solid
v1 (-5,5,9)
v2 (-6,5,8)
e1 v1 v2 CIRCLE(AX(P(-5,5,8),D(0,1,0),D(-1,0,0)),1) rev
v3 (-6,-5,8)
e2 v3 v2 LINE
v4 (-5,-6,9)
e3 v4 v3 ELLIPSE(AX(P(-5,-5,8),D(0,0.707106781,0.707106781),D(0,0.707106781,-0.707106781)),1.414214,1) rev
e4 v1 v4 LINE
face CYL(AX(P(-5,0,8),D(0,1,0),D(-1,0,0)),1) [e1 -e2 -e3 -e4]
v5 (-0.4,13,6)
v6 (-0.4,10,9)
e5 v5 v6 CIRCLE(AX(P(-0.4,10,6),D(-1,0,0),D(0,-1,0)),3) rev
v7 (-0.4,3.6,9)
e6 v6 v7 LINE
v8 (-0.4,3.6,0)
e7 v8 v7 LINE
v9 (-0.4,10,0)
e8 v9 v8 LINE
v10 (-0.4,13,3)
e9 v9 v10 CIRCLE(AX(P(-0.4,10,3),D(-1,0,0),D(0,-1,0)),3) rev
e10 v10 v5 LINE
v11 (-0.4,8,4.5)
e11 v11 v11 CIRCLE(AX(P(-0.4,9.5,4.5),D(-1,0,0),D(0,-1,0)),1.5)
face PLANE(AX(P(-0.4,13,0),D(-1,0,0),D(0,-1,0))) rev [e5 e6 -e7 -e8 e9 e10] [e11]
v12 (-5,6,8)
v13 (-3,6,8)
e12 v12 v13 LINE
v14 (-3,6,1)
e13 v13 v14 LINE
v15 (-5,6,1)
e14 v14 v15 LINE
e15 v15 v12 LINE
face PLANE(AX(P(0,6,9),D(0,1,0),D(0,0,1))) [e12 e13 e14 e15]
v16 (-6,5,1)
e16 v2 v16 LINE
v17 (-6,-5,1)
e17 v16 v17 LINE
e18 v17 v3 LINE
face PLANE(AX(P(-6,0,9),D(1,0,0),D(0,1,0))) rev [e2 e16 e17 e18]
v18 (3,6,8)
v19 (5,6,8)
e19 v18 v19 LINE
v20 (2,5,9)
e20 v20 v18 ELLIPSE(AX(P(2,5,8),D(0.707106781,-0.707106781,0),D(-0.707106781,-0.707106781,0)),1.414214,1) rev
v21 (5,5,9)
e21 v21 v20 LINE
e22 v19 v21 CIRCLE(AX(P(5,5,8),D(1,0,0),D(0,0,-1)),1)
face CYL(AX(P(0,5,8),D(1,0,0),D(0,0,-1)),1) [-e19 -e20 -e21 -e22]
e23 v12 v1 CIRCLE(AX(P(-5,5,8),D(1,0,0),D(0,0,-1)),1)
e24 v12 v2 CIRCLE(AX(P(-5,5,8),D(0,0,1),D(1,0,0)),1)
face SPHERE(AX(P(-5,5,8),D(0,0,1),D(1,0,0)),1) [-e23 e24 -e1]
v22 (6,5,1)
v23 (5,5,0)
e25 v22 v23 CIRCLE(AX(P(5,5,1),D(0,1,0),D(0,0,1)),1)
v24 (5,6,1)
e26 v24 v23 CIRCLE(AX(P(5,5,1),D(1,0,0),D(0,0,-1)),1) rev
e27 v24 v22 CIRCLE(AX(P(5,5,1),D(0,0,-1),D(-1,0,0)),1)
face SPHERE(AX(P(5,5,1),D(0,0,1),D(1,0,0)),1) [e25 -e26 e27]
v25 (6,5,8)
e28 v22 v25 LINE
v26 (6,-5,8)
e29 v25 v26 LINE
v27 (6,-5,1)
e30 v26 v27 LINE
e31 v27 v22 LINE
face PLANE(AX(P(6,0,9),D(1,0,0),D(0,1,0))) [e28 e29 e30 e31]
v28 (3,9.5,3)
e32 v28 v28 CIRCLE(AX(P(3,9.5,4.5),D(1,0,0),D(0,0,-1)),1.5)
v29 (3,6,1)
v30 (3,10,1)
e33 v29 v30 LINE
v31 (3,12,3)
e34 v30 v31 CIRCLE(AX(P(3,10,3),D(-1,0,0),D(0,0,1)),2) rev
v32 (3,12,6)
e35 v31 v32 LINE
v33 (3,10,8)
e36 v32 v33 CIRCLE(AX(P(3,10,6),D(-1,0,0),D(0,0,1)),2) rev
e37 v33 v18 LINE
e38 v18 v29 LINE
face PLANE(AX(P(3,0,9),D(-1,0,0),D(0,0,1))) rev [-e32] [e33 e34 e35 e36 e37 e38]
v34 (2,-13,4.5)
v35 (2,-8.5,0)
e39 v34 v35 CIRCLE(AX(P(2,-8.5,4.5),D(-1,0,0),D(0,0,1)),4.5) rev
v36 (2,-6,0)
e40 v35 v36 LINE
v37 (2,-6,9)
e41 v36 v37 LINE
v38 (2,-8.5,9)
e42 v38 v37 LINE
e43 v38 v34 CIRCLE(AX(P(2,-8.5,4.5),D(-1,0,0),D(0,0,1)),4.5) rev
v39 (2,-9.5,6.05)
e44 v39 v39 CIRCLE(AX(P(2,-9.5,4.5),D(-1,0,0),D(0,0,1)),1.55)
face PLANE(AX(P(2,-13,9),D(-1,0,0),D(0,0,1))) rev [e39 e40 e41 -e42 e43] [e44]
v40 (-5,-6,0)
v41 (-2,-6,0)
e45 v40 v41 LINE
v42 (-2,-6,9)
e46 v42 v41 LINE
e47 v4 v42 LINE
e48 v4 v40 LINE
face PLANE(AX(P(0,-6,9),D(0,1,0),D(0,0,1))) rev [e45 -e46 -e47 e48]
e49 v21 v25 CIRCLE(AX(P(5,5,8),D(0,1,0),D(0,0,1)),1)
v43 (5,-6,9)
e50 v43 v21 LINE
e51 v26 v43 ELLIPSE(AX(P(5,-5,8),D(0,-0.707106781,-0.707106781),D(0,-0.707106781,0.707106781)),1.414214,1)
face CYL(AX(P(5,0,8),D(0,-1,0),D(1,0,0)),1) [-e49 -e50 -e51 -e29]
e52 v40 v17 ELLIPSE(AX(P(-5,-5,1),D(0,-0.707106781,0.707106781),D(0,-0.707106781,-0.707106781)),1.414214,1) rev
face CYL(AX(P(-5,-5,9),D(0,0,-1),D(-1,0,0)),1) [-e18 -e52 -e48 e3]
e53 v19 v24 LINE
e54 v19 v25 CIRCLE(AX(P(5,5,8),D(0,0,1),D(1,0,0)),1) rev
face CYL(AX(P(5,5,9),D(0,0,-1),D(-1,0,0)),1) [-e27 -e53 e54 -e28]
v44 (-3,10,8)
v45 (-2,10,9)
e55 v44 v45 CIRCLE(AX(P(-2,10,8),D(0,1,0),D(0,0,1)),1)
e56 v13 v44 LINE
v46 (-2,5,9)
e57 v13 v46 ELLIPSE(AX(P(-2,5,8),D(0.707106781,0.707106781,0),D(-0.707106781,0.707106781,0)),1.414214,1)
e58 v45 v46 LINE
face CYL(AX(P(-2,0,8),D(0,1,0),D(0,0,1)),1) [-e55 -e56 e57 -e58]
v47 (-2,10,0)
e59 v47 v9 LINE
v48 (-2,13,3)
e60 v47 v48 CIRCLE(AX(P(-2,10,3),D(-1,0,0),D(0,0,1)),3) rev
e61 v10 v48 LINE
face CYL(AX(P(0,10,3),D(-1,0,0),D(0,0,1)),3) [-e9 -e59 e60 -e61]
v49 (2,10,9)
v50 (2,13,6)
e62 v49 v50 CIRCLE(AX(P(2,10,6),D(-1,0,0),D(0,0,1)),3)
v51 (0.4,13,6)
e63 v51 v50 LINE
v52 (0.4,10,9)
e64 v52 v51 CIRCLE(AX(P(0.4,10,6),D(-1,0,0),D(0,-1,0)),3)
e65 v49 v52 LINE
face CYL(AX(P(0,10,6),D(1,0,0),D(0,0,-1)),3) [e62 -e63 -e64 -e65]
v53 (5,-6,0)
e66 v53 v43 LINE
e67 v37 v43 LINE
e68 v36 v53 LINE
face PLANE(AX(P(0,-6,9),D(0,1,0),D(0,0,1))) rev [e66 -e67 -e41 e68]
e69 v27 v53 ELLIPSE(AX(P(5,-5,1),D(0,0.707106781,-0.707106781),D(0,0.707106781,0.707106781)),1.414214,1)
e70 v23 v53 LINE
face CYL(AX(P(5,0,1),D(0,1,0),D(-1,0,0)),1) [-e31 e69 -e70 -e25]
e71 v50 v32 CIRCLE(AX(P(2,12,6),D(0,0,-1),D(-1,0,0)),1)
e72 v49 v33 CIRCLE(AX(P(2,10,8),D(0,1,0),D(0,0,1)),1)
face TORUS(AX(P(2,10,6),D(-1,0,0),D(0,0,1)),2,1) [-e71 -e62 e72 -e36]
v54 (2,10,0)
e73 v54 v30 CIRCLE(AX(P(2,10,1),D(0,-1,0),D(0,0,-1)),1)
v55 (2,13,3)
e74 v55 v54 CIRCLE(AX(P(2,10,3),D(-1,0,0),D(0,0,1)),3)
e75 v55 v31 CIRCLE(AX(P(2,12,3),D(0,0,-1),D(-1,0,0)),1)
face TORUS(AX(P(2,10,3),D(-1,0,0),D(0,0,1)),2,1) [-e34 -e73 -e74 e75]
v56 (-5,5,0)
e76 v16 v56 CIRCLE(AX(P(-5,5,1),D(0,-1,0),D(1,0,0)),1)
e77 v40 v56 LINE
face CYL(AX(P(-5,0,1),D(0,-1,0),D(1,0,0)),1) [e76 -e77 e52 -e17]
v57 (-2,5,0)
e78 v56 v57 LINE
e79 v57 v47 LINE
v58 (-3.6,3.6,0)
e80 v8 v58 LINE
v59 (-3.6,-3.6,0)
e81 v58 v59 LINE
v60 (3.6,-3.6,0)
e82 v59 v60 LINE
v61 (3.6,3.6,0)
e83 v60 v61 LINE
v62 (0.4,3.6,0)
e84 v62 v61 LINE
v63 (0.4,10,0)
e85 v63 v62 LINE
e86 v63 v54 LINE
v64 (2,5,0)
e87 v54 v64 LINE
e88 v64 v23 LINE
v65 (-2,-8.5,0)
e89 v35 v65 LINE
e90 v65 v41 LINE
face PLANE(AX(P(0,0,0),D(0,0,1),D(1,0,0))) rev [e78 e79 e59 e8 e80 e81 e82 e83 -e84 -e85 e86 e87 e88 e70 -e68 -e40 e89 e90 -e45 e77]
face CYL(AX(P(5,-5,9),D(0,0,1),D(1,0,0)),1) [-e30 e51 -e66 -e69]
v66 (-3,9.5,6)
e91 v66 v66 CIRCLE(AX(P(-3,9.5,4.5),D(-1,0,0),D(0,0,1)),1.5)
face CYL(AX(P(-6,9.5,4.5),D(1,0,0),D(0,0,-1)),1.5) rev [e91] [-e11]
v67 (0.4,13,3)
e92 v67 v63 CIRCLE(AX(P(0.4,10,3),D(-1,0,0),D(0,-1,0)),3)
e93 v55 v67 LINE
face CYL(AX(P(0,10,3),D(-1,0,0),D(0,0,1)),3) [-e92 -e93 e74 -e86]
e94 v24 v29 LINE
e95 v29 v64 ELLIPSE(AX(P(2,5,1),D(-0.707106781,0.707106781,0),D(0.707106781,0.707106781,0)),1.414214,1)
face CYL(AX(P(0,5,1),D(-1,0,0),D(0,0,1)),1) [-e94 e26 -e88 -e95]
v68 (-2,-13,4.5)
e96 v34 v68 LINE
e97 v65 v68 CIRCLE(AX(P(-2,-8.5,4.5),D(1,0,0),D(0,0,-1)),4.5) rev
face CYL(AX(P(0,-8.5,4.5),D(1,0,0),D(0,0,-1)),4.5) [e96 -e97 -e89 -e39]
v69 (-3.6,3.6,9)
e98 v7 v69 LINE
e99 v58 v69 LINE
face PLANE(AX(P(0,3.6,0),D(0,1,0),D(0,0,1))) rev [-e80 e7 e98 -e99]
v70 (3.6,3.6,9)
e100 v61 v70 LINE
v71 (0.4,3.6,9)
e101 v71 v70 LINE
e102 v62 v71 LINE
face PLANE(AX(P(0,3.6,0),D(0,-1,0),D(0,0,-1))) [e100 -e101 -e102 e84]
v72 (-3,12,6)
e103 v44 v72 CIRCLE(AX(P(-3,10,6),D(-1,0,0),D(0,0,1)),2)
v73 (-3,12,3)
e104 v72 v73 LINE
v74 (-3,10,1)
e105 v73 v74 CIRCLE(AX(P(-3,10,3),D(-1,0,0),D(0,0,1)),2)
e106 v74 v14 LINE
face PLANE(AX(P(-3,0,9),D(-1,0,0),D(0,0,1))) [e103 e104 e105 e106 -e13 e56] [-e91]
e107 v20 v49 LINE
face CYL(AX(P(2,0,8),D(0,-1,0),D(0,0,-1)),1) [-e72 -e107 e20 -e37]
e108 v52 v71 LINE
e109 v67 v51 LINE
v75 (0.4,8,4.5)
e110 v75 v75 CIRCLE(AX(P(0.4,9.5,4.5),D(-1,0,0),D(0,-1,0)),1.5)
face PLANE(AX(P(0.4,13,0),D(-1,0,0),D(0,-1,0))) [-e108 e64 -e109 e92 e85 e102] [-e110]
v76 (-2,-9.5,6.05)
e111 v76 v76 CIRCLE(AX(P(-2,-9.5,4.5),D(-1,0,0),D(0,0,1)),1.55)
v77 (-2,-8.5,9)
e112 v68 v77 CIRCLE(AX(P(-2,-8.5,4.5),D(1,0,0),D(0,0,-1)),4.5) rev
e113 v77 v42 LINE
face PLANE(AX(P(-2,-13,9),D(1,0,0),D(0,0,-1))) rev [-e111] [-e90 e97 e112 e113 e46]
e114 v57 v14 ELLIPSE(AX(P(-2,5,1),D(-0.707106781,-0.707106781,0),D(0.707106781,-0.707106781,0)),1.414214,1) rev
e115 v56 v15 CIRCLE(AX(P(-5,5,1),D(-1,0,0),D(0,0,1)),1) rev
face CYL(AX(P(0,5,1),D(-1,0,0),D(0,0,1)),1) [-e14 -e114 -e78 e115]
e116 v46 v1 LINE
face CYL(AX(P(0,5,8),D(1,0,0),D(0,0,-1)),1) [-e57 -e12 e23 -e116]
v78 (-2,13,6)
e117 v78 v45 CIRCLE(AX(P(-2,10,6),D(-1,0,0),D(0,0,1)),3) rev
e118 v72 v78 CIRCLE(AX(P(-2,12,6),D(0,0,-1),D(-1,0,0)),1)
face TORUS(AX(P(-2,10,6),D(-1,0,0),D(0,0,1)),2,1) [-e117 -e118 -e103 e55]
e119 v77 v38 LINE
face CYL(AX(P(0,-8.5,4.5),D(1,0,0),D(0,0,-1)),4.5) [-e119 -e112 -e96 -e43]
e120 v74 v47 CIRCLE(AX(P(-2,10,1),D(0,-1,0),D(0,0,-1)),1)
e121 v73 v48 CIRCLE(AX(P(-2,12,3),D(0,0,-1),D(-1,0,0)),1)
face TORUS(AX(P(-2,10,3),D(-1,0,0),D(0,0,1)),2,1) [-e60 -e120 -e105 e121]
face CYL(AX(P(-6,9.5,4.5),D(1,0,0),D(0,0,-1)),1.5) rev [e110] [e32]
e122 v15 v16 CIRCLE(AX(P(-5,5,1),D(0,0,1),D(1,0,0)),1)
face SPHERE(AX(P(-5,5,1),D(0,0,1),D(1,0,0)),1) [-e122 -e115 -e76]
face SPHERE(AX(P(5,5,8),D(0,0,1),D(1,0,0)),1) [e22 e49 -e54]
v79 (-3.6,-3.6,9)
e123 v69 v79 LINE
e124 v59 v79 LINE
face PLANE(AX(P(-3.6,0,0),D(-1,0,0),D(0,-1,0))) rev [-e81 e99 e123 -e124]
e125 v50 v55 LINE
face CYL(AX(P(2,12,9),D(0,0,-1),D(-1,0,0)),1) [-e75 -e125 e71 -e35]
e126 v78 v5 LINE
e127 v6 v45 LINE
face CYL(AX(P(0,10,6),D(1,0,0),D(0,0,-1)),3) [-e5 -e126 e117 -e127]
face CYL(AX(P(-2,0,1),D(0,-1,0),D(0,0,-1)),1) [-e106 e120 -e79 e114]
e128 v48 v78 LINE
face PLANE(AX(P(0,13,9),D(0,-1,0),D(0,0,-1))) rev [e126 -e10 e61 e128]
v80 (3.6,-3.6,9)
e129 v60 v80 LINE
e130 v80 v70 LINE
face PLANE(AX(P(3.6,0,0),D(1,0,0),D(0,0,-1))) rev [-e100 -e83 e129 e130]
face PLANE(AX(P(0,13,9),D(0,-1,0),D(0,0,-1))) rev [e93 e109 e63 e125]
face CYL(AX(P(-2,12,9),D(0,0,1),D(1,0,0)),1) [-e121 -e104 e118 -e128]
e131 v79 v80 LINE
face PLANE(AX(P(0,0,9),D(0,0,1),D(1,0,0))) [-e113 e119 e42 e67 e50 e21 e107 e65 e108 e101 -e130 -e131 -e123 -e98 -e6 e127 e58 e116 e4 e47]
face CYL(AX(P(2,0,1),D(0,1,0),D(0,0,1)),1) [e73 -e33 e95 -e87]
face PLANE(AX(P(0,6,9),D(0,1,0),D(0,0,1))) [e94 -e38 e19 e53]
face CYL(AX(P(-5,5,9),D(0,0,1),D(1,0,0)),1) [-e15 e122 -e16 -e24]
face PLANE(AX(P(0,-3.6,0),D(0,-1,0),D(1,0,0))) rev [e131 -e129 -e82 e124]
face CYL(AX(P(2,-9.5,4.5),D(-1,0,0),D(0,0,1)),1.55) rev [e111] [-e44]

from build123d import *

# Parameters (mm, degrees)
SKETCH_1_W          = 3
SKETCH_1_H          = 7
SKETCH_1_W_2        = 12
SKETCH_1_H_2        = 12
SKETCH_1_W_3        = 7
SKETCH_1_W_4        = 5
EXTRUDE_1_DEPTH     = 9
CUT_EXTRUDE_1_DEPTH = 17.911534525
FILLET_2_R          = 3
SKETCH_4_R          = 1.5
CUT_EXTRUDE_3_DEPTH = 19.193405399
FILLET_3_R          = 1
FILLET_4_R          = 1
FILLET_5_R          = 1
SKETCH_5_W          = 5
SKETCH_5_H          = 7
CUT_EXTRUDE_4_DEPTH = 9
EXTRUDE_2_DEPTH     = 7
FILLET_6_R          = 4.5
SKETCH_7_R          = 1.55
CUT_EXTRUDE_5_DEPTH = 4
SKETCH_8_W          = 3.1
SKETCH_8_H          = 0.1
CUT_EXTRUDE_6_DEPTH = 17.911534525


# Some blends are built 0.0001 mm under size
with BuildPart() as part:
    # 草图1 → 凸台-拉伸1 (new body)
    # profile 1 of 4: a face of its own
    with BuildSketch(Plane.XY):
        with Locations((-1.5, 9.5)):
            Rectangle(SKETCH_1_W, SKETCH_1_H)
    # profile 2 of 4: a face of its own
    with BuildSketch(Plane.XY):
        with Locations((1.5, 9.5)):
            Rectangle(SKETCH_1_W, SKETCH_1_H)
    # profile 3 of 4: a face of its own
    with BuildSketch(Plane.XY):
        Rectangle(SKETCH_1_W_2, SKETCH_1_H_2)
        Rectangle(SKETCH_1_W_3, SKETCH_1_H, mode=Mode.SUBTRACT)
    # profile 4 of 4: a face of its own
    with BuildSketch(Plane.XY):
        with Locations((1, -9.5)):
            Rectangle(SKETCH_1_W_4, SKETCH_1_H)
    extrude(amount=EXTRUDE_1_DEPTH)

    # 草图2 → 切除-拉伸1 (cut, through all)
    with BuildSketch(Plane.XY.offset(9)):
        Polygon((0, 13), (0.4, 13), (0.4, 3.5), (0, 3.5), (-0.4, 3.5), (-0.4, 13), align=None)
    extrude(amount=-CUT_EXTRUDE_1_DEPTH, mode=Mode.SUBTRACT)

    # 圆角2
    fillet_2_edges = [part.edges().sort_by_distance(p)[0] for p in [
        (1.7, 13, 9),
        (1.7, 13, 0),
        (-1.7, 13, 0),
        (-1.7, 13, 9),
    ]]
    fillet(fillet_2_edges, radius=FILLET_2_R)

    # 草图4 → 切除-拉伸3 (cut, through all)
    with BuildSketch(Plane(origin=(3, 0, 0), x_dir=(0, 0, -1), z_dir=(1, 0, 0))):
        with Locations((-4.5, 9.5)):
            Circle(SKETCH_4_R)
    extrude(amount=-CUT_EXTRUDE_3_DEPTH, mode=Mode.SUBTRACT)

    # 圆角3
    fillet_3_edges = [part.edges().sort_by_distance(p)[0] for p in [
        (3, 8, 9),
        (6, 0, 0),
        (3, 8, 0),
        (4.5, 6, 0),
        (6, 6, 4.5),
        (6, -6, 4.5),
        (4.5, 6, 9),
        (6, 0, 9),
        (3, 13, 4.5),
        (3, 12.121320344, 8.121320344),
        (3, 12.121320344, 0.878679656),
    ]]
    fillet(fillet_3_edges, radius=FILLET_3_R)

    # 圆角4
    fillet_4_edges = [part.edges().sort_by_distance(p)[0] for p in [
        (-3, 8, 9),
        (-6, 0, 0),
        (-4.5, 6, 0),
        (-3, 8, 0),
        (-4.5, 6, 9),
        (-6, 0, 9),
        (-6, -6, 4.5),
        (-3, 13, 4.5),
        (-3, 12.121320344, 8.121320344),
        (-3, 12.121320344, 0.878679656),
    ]]
    fillet(fillet_4_edges, radius=FILLET_4_R)

    # 圆角5
    # the kernel refuses this fillet: 1 mm, written as the material it takes off along each edge
    with BuildSketch(Plane(origin=(-5, 5, 8), x_dir=(0, 1, 0), z_dir=(-1, 0, 0))) as fillet_5_piece_1_section:
        Polygon((0, 0), (FILLET_5_R, 0), (FILLET_5_R, -FILLET_5_R), (0, -FILLET_5_R), align=None)
    fillet_5_piece_1 = extrude(amount=FILLET_5_R, mode=Mode.PRIVATE)
    fillet_5_piece_1 = fillet_5_piece_1 - Plane(origin=(-5, 5, 8), x_dir=(0, -0.7071067811865475, -0.7071067811865475), z_dir=(-1, 0, 0)) * Sphere(FILLET_5_R, mode=Mode.PRIVATE)
    add(fillet_5_piece_1, mode=Mode.SUBTRACT)
    with BuildSketch(Plane(origin=(-5, 5, 1), x_dir=(0, 1, 0), z_dir=(-1, 0, 0))) as fillet_5_piece_2_section:
        Polygon((0, 0), (FILLET_5_R, 0), (FILLET_5_R, FILLET_5_R), (0, FILLET_5_R), align=None)
    fillet_5_piece_2 = extrude(amount=FILLET_5_R, mode=Mode.PRIVATE)
    fillet_5_piece_2 = fillet_5_piece_2 - Plane(origin=(-5, 5, 1), x_dir=(0, -0.7071067811865475, 0.7071067811865475), z_dir=(-1, 0, 0)) * Sphere(FILLET_5_R, mode=Mode.PRIVATE)
    add(fillet_5_piece_2, mode=Mode.SUBTRACT)
    with BuildSketch(Plane(origin=(-6, 6, 1), x_dir=(0, -1, 0), z_dir=(0, 0, 1))) as fillet_5_piece_3:
        with BuildLine():
            CenterArc((FILLET_5_R, FILLET_5_R), FILLET_5_R, 180, 90)
            Line((0, FILLET_5_R), (0, 0))
            Line((0, 0), (FILLET_5_R, 0))
        make_face()
    extrude(amount=7, mode=Mode.SUBTRACT)

    # 草图5 → 切除-拉伸4 (cut)
    with BuildSketch(Plane.XY.offset(9)):
        with Locations((1, -9.5)):
            Rectangle(SKETCH_5_W, SKETCH_5_H)
    extrude(amount=-CUT_EXTRUDE_4_DEPTH, mode=Mode.SUBTRACT)

    # 草图6 → 凸台-拉伸2 (add)
    with BuildSketch(Plane.XZ.offset(6)):
        Polygon((0, 9), (-2, 9), (-2, 0), (0, 0), (2, 0), (2, 9), align=None)
    extrude(amount=EXTRUDE_2_DEPTH)

    # 圆角6
    fillet_6_edges = [part.edges().sort_by_distance(p)[0] for p in [
        (0, -13, 0),
        (0, -13, 9),
    ]]
    fillet(fillet_6_edges, radius=FILLET_6_R - 0.0001)  # a hair under: the kernel refuses the full size

    # 草图7 → 切除-拉伸5 (cut)
    with BuildSketch(Plane.ZY.offset(2)):
        with Locations((4.5, -9.5)):
            Circle(SKETCH_7_R)
    extrude(amount=-CUT_EXTRUDE_5_DEPTH, mode=Mode.SUBTRACT)

    # 草图8 → 切除-拉伸6 (cut, through all)
    with BuildSketch(Plane.XY.offset(9)):
        with Locations((-1.95, 3.55)):
            Rectangle(SKETCH_8_W, SKETCH_8_H)
        Polygon((0.4, 3.5), (3.5, 3.5), (3.6, 3.5), (3.6, 3.6), (0.4, 3.6), align=None)
        Polygon((3.6, 3.5), (3.5, 3.5), (3.5, -3.5), (3.5, -3.6), (3.6, -3.6), align=None)
        Polygon((-3.6, -3.5), (-3.5, -3.5), (-3.5, 3.5), (-3.5, 3.6), (-3.6, 3.6), align=None)
        Polygon((3.5, -3.6), (3.5, -3.5), (-3.5, -3.5), (-3.6, -3.5), (-3.6, -3.6), align=None)
    extrude(amount=-CUT_EXTRUDE_6_DEPTH, mode=Mode.SUBTRACT)


solid = part.part
